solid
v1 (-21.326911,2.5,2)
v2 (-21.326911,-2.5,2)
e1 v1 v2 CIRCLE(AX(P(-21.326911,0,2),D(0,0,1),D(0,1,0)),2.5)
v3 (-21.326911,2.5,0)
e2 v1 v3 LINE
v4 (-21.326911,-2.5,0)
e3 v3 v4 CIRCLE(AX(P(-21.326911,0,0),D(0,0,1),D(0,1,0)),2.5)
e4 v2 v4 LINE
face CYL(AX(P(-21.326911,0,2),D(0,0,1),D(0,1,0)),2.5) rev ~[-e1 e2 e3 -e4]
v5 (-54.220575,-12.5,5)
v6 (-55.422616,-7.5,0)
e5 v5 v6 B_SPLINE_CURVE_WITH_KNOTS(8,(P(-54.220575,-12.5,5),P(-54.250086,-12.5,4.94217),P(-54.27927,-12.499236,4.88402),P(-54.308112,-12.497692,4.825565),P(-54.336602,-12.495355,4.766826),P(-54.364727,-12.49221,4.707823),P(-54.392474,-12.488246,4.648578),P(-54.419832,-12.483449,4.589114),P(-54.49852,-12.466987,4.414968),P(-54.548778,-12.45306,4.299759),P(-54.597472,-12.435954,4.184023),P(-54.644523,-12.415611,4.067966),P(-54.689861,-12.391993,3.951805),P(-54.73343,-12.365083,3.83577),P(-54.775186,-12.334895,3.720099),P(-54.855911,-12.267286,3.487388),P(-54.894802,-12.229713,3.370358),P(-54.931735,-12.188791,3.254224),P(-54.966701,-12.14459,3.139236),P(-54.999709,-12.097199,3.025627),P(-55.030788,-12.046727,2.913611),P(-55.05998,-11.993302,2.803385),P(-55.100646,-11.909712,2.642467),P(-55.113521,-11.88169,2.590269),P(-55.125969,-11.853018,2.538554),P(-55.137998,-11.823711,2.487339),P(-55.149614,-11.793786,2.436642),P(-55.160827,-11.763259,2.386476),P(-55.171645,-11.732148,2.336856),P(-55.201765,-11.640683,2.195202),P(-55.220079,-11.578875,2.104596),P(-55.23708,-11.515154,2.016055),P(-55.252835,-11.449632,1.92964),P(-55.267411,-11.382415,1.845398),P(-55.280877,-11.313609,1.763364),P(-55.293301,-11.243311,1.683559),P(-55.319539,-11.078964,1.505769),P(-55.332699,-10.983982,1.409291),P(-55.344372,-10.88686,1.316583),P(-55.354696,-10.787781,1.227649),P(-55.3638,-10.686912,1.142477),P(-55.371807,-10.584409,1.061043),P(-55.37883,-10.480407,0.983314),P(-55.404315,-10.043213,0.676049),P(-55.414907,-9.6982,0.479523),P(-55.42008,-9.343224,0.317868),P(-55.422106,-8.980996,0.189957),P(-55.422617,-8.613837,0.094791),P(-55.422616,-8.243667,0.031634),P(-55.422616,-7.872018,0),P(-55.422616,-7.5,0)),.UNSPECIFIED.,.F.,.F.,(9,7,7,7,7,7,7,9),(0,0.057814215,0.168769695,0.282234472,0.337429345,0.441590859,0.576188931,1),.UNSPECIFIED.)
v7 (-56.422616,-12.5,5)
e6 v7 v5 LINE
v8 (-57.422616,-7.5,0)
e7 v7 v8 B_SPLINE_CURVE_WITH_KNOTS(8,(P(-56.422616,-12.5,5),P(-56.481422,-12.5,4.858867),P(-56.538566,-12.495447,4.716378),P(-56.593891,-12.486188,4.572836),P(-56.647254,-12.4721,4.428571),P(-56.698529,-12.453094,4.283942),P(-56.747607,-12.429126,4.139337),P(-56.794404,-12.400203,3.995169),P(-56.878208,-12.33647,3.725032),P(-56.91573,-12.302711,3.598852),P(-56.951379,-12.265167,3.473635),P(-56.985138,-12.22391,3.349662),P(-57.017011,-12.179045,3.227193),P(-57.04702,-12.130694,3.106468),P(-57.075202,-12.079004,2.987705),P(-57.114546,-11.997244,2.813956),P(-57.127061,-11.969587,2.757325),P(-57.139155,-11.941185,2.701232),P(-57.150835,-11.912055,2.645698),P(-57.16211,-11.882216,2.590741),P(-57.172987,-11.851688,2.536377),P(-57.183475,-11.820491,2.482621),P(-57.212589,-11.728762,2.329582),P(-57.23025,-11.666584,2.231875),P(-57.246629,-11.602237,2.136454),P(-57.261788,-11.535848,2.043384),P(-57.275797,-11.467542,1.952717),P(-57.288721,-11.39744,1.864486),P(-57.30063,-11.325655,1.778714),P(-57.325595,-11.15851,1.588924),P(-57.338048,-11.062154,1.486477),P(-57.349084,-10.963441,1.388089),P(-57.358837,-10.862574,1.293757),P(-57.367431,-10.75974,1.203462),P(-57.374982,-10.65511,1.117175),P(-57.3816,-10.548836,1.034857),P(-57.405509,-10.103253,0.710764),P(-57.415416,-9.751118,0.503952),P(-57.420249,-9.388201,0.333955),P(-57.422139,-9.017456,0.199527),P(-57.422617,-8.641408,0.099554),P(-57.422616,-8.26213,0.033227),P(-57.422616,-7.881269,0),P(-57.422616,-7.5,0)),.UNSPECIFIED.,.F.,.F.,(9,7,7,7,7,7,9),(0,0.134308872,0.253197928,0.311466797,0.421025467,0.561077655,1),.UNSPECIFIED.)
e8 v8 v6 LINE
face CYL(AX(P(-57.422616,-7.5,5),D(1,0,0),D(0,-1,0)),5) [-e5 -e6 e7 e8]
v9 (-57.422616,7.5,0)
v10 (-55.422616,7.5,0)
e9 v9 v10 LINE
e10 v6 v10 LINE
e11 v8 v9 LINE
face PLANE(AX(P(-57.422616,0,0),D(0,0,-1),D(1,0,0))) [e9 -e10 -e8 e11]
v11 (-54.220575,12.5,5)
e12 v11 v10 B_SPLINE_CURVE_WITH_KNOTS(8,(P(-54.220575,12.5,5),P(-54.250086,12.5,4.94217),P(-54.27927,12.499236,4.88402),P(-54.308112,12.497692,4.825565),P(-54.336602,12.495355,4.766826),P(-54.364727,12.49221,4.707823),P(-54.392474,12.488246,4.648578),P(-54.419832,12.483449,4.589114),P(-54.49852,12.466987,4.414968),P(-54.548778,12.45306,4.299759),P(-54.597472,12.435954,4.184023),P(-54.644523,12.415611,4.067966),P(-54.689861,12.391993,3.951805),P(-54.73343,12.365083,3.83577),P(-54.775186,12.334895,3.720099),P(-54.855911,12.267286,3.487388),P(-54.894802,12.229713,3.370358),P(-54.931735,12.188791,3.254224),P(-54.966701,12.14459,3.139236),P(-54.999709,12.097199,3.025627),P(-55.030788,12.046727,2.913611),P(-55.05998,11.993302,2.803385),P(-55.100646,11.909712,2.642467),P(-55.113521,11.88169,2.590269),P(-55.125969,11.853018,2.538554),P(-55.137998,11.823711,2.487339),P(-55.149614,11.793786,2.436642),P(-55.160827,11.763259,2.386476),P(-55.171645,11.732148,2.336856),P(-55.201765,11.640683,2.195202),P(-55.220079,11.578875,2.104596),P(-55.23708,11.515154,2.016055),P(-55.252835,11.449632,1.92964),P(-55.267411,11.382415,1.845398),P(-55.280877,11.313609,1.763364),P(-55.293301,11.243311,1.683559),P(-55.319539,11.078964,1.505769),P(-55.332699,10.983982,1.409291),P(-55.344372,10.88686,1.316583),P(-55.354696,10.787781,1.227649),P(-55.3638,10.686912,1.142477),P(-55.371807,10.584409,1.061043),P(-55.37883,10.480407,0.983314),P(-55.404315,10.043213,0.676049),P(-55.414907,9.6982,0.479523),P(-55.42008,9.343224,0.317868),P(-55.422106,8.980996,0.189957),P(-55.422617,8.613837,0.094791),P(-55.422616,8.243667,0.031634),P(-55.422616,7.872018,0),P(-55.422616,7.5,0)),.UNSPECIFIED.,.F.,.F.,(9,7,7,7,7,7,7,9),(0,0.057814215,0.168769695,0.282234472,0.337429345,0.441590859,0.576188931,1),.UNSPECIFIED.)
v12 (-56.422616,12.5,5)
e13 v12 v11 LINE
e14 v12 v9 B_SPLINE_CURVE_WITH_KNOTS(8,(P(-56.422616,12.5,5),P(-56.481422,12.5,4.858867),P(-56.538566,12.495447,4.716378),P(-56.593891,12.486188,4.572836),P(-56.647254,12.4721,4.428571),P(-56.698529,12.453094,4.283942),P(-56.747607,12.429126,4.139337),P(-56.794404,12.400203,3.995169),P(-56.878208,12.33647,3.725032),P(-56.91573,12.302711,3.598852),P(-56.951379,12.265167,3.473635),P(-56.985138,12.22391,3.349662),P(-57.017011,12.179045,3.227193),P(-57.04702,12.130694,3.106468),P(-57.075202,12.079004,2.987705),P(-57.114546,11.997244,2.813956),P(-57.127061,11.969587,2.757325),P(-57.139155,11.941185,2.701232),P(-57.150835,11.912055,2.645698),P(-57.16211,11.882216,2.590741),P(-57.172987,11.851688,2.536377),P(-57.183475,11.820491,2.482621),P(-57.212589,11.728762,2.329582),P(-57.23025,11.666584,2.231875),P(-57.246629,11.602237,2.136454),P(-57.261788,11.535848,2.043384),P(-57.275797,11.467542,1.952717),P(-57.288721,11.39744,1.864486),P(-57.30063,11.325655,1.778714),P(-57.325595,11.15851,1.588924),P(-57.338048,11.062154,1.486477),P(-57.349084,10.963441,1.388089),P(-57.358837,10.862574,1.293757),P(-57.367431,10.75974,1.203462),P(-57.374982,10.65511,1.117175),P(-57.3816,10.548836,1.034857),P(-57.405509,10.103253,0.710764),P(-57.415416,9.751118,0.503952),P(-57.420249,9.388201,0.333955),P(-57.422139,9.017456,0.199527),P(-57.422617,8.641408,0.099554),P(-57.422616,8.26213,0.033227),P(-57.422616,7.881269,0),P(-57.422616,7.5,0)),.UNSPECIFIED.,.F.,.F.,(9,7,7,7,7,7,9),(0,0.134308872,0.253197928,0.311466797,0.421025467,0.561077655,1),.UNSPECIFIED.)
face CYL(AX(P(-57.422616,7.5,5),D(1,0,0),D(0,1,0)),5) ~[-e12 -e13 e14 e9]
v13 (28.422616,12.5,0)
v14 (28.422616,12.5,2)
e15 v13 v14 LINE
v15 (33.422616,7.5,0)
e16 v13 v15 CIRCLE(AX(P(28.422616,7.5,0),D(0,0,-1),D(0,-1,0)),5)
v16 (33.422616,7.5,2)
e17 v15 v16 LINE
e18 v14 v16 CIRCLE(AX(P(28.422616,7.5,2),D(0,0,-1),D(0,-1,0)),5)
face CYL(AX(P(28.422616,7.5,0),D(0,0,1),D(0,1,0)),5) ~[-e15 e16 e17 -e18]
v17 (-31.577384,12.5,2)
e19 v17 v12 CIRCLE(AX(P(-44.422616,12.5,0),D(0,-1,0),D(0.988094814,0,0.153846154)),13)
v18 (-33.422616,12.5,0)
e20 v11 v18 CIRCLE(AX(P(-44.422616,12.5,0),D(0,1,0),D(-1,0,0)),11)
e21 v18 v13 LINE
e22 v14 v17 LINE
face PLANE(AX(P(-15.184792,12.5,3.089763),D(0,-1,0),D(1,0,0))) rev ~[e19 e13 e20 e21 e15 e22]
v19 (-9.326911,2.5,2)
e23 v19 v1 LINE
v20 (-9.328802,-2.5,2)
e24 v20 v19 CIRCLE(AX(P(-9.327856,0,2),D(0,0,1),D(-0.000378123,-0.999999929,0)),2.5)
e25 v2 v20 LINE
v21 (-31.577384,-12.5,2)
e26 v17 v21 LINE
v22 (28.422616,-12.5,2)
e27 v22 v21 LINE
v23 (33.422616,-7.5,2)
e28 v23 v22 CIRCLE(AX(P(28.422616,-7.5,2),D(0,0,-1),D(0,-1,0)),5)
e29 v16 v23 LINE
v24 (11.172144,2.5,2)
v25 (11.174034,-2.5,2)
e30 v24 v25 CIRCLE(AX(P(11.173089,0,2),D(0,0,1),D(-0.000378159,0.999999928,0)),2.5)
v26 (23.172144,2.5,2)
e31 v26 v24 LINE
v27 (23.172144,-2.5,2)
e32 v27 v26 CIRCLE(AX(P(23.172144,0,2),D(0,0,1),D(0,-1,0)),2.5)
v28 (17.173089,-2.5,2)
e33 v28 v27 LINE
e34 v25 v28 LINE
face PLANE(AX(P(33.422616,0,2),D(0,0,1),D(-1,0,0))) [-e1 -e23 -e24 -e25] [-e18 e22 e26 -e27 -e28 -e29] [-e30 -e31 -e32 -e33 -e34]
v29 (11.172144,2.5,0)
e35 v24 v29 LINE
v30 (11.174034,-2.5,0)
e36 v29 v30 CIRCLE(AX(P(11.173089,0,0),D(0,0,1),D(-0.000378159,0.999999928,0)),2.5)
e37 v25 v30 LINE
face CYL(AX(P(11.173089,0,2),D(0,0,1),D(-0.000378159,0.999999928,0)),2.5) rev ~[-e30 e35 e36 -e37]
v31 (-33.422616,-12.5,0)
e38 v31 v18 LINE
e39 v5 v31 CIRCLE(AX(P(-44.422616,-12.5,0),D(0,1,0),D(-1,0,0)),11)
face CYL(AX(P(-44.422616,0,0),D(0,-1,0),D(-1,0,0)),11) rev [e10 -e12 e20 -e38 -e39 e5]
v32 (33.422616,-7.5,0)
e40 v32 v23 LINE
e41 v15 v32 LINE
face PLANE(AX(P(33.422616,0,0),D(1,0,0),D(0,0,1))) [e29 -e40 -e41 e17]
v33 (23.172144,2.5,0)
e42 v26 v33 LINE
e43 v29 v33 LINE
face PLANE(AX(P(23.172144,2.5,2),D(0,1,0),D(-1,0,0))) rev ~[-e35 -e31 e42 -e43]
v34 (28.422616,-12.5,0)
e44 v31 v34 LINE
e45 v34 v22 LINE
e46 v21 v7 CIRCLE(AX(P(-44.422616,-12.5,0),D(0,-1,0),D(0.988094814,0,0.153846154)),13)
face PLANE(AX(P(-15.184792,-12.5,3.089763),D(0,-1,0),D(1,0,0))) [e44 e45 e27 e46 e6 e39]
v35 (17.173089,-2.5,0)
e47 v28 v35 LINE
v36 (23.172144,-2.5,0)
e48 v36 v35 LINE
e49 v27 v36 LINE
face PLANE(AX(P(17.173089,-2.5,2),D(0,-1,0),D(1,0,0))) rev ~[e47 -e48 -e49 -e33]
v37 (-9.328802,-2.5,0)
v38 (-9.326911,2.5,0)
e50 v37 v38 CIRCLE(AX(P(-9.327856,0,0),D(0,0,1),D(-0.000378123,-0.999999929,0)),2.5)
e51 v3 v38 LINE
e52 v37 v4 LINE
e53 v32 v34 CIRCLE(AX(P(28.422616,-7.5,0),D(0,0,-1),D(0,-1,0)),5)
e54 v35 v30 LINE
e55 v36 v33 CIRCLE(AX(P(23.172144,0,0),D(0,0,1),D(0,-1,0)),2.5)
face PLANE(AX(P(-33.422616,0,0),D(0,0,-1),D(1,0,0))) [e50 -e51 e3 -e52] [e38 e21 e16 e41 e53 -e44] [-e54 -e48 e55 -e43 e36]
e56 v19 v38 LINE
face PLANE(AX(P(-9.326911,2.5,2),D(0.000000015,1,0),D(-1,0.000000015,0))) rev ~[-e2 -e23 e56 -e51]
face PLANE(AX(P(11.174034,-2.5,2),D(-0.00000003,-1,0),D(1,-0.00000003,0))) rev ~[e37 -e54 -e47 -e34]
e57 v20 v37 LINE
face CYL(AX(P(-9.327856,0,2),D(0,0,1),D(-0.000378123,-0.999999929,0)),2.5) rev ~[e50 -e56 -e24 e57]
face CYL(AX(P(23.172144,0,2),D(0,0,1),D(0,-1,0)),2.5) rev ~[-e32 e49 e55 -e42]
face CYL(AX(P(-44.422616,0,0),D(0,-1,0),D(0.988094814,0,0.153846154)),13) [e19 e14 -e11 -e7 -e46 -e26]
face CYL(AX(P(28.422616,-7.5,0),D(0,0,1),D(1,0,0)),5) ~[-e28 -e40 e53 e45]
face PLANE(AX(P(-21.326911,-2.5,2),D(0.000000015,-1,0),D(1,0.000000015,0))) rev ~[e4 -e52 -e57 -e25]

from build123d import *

# Parameters (mm, degrees)
F1_DEPTH = 12.5
F3_DEPTH = 25
F4_R     = 5


# Not quite as in the source:
# - ends of sketch curves that miss each other by under 0.0002 mm in the source are joined


with BuildPart() as f1:
    # F0 (on Front) → F1 (new body, symmetric)
    with BuildSketch(Plane.XZ):
        with BuildLine():
            Line((-33.4226162893, 0), (33.4226162893, 0))
            Line((33.4226162893, 0), (33.4226162893, 2))
            Line((33.4226162893, 2), (-31.5773837107, 2))
            ThreePointArc((-31.5773837107, 2), (-45.4256059397, 12.9612503934), (-57.4226162893, 0))
            Line((-57.4226162893, 0), (-55.4226162893, 0))
            ThreePointArc((-55.4226162893, 0), (-44.4226162893, 11), (-33.4226162893, 0))
        make_face()
    extrude(amount=F1_DEPTH, both=True)

    # F2 (on face) → F3 (cut)
    with BuildSketch(Plane.XY.offset(2)):
        with BuildLine():
            Line((17.172143635, 2.5), (11.172143635, 2.5))
            ThreePointArc((11.172143635, 2.5), (8.6730891224, -0.0009453085), (11.1740342522, -2.4999998213))
            Line((11.1740342522, -2.4999998213), (17.1730889436, -2.5))
            Line((17.1730889436, -2.5), (17.172143635, 2.5))
        make_face()
        with BuildLine():
            Line((23.172143635, 2.5), (17.172143635, 2.5))
            Line((17.172143635, 2.5), (17.1730889436, -2.5))
            Line((17.1730889436, -2.5), (23.172143635, -2.5))
            ThreePointArc((23.172143635, -2.5), (25.672143635, 0), (23.172143635, 2.5))
        make_face()
        with BuildLine():
            ThreePointArc((-9.3288016735, -2.4999998213), (-6.8278565437, -0.0009453085), (-9.3269110564, 2.4999998213))
            Line((-9.3269110564, 2.4999998213), (-21.3269110564, 2.5))
            ThreePointArc((-21.3269110564, 2.5), (-23.8269110564, 0), (-21.3269110564, -2.5))
            Line((-21.3269110564, -2.5), (-9.3288016735, -2.4999998213))
        make_face()
    extrude(amount=-F3_DEPTH, mode=Mode.SUBTRACT)

    # F4
    f4_edges = [f1.edges().sort_by_distance(p)[0] for p in [
        (33.422616, 12.5, 1),
        (33.422616, -12.5, 1),
        (-56.422616, -12.5, 0),
        (-56.422616, 12.5, 0),
    ]]
    fillet(f4_edges, radius=F4_R)


solid = f1.part
